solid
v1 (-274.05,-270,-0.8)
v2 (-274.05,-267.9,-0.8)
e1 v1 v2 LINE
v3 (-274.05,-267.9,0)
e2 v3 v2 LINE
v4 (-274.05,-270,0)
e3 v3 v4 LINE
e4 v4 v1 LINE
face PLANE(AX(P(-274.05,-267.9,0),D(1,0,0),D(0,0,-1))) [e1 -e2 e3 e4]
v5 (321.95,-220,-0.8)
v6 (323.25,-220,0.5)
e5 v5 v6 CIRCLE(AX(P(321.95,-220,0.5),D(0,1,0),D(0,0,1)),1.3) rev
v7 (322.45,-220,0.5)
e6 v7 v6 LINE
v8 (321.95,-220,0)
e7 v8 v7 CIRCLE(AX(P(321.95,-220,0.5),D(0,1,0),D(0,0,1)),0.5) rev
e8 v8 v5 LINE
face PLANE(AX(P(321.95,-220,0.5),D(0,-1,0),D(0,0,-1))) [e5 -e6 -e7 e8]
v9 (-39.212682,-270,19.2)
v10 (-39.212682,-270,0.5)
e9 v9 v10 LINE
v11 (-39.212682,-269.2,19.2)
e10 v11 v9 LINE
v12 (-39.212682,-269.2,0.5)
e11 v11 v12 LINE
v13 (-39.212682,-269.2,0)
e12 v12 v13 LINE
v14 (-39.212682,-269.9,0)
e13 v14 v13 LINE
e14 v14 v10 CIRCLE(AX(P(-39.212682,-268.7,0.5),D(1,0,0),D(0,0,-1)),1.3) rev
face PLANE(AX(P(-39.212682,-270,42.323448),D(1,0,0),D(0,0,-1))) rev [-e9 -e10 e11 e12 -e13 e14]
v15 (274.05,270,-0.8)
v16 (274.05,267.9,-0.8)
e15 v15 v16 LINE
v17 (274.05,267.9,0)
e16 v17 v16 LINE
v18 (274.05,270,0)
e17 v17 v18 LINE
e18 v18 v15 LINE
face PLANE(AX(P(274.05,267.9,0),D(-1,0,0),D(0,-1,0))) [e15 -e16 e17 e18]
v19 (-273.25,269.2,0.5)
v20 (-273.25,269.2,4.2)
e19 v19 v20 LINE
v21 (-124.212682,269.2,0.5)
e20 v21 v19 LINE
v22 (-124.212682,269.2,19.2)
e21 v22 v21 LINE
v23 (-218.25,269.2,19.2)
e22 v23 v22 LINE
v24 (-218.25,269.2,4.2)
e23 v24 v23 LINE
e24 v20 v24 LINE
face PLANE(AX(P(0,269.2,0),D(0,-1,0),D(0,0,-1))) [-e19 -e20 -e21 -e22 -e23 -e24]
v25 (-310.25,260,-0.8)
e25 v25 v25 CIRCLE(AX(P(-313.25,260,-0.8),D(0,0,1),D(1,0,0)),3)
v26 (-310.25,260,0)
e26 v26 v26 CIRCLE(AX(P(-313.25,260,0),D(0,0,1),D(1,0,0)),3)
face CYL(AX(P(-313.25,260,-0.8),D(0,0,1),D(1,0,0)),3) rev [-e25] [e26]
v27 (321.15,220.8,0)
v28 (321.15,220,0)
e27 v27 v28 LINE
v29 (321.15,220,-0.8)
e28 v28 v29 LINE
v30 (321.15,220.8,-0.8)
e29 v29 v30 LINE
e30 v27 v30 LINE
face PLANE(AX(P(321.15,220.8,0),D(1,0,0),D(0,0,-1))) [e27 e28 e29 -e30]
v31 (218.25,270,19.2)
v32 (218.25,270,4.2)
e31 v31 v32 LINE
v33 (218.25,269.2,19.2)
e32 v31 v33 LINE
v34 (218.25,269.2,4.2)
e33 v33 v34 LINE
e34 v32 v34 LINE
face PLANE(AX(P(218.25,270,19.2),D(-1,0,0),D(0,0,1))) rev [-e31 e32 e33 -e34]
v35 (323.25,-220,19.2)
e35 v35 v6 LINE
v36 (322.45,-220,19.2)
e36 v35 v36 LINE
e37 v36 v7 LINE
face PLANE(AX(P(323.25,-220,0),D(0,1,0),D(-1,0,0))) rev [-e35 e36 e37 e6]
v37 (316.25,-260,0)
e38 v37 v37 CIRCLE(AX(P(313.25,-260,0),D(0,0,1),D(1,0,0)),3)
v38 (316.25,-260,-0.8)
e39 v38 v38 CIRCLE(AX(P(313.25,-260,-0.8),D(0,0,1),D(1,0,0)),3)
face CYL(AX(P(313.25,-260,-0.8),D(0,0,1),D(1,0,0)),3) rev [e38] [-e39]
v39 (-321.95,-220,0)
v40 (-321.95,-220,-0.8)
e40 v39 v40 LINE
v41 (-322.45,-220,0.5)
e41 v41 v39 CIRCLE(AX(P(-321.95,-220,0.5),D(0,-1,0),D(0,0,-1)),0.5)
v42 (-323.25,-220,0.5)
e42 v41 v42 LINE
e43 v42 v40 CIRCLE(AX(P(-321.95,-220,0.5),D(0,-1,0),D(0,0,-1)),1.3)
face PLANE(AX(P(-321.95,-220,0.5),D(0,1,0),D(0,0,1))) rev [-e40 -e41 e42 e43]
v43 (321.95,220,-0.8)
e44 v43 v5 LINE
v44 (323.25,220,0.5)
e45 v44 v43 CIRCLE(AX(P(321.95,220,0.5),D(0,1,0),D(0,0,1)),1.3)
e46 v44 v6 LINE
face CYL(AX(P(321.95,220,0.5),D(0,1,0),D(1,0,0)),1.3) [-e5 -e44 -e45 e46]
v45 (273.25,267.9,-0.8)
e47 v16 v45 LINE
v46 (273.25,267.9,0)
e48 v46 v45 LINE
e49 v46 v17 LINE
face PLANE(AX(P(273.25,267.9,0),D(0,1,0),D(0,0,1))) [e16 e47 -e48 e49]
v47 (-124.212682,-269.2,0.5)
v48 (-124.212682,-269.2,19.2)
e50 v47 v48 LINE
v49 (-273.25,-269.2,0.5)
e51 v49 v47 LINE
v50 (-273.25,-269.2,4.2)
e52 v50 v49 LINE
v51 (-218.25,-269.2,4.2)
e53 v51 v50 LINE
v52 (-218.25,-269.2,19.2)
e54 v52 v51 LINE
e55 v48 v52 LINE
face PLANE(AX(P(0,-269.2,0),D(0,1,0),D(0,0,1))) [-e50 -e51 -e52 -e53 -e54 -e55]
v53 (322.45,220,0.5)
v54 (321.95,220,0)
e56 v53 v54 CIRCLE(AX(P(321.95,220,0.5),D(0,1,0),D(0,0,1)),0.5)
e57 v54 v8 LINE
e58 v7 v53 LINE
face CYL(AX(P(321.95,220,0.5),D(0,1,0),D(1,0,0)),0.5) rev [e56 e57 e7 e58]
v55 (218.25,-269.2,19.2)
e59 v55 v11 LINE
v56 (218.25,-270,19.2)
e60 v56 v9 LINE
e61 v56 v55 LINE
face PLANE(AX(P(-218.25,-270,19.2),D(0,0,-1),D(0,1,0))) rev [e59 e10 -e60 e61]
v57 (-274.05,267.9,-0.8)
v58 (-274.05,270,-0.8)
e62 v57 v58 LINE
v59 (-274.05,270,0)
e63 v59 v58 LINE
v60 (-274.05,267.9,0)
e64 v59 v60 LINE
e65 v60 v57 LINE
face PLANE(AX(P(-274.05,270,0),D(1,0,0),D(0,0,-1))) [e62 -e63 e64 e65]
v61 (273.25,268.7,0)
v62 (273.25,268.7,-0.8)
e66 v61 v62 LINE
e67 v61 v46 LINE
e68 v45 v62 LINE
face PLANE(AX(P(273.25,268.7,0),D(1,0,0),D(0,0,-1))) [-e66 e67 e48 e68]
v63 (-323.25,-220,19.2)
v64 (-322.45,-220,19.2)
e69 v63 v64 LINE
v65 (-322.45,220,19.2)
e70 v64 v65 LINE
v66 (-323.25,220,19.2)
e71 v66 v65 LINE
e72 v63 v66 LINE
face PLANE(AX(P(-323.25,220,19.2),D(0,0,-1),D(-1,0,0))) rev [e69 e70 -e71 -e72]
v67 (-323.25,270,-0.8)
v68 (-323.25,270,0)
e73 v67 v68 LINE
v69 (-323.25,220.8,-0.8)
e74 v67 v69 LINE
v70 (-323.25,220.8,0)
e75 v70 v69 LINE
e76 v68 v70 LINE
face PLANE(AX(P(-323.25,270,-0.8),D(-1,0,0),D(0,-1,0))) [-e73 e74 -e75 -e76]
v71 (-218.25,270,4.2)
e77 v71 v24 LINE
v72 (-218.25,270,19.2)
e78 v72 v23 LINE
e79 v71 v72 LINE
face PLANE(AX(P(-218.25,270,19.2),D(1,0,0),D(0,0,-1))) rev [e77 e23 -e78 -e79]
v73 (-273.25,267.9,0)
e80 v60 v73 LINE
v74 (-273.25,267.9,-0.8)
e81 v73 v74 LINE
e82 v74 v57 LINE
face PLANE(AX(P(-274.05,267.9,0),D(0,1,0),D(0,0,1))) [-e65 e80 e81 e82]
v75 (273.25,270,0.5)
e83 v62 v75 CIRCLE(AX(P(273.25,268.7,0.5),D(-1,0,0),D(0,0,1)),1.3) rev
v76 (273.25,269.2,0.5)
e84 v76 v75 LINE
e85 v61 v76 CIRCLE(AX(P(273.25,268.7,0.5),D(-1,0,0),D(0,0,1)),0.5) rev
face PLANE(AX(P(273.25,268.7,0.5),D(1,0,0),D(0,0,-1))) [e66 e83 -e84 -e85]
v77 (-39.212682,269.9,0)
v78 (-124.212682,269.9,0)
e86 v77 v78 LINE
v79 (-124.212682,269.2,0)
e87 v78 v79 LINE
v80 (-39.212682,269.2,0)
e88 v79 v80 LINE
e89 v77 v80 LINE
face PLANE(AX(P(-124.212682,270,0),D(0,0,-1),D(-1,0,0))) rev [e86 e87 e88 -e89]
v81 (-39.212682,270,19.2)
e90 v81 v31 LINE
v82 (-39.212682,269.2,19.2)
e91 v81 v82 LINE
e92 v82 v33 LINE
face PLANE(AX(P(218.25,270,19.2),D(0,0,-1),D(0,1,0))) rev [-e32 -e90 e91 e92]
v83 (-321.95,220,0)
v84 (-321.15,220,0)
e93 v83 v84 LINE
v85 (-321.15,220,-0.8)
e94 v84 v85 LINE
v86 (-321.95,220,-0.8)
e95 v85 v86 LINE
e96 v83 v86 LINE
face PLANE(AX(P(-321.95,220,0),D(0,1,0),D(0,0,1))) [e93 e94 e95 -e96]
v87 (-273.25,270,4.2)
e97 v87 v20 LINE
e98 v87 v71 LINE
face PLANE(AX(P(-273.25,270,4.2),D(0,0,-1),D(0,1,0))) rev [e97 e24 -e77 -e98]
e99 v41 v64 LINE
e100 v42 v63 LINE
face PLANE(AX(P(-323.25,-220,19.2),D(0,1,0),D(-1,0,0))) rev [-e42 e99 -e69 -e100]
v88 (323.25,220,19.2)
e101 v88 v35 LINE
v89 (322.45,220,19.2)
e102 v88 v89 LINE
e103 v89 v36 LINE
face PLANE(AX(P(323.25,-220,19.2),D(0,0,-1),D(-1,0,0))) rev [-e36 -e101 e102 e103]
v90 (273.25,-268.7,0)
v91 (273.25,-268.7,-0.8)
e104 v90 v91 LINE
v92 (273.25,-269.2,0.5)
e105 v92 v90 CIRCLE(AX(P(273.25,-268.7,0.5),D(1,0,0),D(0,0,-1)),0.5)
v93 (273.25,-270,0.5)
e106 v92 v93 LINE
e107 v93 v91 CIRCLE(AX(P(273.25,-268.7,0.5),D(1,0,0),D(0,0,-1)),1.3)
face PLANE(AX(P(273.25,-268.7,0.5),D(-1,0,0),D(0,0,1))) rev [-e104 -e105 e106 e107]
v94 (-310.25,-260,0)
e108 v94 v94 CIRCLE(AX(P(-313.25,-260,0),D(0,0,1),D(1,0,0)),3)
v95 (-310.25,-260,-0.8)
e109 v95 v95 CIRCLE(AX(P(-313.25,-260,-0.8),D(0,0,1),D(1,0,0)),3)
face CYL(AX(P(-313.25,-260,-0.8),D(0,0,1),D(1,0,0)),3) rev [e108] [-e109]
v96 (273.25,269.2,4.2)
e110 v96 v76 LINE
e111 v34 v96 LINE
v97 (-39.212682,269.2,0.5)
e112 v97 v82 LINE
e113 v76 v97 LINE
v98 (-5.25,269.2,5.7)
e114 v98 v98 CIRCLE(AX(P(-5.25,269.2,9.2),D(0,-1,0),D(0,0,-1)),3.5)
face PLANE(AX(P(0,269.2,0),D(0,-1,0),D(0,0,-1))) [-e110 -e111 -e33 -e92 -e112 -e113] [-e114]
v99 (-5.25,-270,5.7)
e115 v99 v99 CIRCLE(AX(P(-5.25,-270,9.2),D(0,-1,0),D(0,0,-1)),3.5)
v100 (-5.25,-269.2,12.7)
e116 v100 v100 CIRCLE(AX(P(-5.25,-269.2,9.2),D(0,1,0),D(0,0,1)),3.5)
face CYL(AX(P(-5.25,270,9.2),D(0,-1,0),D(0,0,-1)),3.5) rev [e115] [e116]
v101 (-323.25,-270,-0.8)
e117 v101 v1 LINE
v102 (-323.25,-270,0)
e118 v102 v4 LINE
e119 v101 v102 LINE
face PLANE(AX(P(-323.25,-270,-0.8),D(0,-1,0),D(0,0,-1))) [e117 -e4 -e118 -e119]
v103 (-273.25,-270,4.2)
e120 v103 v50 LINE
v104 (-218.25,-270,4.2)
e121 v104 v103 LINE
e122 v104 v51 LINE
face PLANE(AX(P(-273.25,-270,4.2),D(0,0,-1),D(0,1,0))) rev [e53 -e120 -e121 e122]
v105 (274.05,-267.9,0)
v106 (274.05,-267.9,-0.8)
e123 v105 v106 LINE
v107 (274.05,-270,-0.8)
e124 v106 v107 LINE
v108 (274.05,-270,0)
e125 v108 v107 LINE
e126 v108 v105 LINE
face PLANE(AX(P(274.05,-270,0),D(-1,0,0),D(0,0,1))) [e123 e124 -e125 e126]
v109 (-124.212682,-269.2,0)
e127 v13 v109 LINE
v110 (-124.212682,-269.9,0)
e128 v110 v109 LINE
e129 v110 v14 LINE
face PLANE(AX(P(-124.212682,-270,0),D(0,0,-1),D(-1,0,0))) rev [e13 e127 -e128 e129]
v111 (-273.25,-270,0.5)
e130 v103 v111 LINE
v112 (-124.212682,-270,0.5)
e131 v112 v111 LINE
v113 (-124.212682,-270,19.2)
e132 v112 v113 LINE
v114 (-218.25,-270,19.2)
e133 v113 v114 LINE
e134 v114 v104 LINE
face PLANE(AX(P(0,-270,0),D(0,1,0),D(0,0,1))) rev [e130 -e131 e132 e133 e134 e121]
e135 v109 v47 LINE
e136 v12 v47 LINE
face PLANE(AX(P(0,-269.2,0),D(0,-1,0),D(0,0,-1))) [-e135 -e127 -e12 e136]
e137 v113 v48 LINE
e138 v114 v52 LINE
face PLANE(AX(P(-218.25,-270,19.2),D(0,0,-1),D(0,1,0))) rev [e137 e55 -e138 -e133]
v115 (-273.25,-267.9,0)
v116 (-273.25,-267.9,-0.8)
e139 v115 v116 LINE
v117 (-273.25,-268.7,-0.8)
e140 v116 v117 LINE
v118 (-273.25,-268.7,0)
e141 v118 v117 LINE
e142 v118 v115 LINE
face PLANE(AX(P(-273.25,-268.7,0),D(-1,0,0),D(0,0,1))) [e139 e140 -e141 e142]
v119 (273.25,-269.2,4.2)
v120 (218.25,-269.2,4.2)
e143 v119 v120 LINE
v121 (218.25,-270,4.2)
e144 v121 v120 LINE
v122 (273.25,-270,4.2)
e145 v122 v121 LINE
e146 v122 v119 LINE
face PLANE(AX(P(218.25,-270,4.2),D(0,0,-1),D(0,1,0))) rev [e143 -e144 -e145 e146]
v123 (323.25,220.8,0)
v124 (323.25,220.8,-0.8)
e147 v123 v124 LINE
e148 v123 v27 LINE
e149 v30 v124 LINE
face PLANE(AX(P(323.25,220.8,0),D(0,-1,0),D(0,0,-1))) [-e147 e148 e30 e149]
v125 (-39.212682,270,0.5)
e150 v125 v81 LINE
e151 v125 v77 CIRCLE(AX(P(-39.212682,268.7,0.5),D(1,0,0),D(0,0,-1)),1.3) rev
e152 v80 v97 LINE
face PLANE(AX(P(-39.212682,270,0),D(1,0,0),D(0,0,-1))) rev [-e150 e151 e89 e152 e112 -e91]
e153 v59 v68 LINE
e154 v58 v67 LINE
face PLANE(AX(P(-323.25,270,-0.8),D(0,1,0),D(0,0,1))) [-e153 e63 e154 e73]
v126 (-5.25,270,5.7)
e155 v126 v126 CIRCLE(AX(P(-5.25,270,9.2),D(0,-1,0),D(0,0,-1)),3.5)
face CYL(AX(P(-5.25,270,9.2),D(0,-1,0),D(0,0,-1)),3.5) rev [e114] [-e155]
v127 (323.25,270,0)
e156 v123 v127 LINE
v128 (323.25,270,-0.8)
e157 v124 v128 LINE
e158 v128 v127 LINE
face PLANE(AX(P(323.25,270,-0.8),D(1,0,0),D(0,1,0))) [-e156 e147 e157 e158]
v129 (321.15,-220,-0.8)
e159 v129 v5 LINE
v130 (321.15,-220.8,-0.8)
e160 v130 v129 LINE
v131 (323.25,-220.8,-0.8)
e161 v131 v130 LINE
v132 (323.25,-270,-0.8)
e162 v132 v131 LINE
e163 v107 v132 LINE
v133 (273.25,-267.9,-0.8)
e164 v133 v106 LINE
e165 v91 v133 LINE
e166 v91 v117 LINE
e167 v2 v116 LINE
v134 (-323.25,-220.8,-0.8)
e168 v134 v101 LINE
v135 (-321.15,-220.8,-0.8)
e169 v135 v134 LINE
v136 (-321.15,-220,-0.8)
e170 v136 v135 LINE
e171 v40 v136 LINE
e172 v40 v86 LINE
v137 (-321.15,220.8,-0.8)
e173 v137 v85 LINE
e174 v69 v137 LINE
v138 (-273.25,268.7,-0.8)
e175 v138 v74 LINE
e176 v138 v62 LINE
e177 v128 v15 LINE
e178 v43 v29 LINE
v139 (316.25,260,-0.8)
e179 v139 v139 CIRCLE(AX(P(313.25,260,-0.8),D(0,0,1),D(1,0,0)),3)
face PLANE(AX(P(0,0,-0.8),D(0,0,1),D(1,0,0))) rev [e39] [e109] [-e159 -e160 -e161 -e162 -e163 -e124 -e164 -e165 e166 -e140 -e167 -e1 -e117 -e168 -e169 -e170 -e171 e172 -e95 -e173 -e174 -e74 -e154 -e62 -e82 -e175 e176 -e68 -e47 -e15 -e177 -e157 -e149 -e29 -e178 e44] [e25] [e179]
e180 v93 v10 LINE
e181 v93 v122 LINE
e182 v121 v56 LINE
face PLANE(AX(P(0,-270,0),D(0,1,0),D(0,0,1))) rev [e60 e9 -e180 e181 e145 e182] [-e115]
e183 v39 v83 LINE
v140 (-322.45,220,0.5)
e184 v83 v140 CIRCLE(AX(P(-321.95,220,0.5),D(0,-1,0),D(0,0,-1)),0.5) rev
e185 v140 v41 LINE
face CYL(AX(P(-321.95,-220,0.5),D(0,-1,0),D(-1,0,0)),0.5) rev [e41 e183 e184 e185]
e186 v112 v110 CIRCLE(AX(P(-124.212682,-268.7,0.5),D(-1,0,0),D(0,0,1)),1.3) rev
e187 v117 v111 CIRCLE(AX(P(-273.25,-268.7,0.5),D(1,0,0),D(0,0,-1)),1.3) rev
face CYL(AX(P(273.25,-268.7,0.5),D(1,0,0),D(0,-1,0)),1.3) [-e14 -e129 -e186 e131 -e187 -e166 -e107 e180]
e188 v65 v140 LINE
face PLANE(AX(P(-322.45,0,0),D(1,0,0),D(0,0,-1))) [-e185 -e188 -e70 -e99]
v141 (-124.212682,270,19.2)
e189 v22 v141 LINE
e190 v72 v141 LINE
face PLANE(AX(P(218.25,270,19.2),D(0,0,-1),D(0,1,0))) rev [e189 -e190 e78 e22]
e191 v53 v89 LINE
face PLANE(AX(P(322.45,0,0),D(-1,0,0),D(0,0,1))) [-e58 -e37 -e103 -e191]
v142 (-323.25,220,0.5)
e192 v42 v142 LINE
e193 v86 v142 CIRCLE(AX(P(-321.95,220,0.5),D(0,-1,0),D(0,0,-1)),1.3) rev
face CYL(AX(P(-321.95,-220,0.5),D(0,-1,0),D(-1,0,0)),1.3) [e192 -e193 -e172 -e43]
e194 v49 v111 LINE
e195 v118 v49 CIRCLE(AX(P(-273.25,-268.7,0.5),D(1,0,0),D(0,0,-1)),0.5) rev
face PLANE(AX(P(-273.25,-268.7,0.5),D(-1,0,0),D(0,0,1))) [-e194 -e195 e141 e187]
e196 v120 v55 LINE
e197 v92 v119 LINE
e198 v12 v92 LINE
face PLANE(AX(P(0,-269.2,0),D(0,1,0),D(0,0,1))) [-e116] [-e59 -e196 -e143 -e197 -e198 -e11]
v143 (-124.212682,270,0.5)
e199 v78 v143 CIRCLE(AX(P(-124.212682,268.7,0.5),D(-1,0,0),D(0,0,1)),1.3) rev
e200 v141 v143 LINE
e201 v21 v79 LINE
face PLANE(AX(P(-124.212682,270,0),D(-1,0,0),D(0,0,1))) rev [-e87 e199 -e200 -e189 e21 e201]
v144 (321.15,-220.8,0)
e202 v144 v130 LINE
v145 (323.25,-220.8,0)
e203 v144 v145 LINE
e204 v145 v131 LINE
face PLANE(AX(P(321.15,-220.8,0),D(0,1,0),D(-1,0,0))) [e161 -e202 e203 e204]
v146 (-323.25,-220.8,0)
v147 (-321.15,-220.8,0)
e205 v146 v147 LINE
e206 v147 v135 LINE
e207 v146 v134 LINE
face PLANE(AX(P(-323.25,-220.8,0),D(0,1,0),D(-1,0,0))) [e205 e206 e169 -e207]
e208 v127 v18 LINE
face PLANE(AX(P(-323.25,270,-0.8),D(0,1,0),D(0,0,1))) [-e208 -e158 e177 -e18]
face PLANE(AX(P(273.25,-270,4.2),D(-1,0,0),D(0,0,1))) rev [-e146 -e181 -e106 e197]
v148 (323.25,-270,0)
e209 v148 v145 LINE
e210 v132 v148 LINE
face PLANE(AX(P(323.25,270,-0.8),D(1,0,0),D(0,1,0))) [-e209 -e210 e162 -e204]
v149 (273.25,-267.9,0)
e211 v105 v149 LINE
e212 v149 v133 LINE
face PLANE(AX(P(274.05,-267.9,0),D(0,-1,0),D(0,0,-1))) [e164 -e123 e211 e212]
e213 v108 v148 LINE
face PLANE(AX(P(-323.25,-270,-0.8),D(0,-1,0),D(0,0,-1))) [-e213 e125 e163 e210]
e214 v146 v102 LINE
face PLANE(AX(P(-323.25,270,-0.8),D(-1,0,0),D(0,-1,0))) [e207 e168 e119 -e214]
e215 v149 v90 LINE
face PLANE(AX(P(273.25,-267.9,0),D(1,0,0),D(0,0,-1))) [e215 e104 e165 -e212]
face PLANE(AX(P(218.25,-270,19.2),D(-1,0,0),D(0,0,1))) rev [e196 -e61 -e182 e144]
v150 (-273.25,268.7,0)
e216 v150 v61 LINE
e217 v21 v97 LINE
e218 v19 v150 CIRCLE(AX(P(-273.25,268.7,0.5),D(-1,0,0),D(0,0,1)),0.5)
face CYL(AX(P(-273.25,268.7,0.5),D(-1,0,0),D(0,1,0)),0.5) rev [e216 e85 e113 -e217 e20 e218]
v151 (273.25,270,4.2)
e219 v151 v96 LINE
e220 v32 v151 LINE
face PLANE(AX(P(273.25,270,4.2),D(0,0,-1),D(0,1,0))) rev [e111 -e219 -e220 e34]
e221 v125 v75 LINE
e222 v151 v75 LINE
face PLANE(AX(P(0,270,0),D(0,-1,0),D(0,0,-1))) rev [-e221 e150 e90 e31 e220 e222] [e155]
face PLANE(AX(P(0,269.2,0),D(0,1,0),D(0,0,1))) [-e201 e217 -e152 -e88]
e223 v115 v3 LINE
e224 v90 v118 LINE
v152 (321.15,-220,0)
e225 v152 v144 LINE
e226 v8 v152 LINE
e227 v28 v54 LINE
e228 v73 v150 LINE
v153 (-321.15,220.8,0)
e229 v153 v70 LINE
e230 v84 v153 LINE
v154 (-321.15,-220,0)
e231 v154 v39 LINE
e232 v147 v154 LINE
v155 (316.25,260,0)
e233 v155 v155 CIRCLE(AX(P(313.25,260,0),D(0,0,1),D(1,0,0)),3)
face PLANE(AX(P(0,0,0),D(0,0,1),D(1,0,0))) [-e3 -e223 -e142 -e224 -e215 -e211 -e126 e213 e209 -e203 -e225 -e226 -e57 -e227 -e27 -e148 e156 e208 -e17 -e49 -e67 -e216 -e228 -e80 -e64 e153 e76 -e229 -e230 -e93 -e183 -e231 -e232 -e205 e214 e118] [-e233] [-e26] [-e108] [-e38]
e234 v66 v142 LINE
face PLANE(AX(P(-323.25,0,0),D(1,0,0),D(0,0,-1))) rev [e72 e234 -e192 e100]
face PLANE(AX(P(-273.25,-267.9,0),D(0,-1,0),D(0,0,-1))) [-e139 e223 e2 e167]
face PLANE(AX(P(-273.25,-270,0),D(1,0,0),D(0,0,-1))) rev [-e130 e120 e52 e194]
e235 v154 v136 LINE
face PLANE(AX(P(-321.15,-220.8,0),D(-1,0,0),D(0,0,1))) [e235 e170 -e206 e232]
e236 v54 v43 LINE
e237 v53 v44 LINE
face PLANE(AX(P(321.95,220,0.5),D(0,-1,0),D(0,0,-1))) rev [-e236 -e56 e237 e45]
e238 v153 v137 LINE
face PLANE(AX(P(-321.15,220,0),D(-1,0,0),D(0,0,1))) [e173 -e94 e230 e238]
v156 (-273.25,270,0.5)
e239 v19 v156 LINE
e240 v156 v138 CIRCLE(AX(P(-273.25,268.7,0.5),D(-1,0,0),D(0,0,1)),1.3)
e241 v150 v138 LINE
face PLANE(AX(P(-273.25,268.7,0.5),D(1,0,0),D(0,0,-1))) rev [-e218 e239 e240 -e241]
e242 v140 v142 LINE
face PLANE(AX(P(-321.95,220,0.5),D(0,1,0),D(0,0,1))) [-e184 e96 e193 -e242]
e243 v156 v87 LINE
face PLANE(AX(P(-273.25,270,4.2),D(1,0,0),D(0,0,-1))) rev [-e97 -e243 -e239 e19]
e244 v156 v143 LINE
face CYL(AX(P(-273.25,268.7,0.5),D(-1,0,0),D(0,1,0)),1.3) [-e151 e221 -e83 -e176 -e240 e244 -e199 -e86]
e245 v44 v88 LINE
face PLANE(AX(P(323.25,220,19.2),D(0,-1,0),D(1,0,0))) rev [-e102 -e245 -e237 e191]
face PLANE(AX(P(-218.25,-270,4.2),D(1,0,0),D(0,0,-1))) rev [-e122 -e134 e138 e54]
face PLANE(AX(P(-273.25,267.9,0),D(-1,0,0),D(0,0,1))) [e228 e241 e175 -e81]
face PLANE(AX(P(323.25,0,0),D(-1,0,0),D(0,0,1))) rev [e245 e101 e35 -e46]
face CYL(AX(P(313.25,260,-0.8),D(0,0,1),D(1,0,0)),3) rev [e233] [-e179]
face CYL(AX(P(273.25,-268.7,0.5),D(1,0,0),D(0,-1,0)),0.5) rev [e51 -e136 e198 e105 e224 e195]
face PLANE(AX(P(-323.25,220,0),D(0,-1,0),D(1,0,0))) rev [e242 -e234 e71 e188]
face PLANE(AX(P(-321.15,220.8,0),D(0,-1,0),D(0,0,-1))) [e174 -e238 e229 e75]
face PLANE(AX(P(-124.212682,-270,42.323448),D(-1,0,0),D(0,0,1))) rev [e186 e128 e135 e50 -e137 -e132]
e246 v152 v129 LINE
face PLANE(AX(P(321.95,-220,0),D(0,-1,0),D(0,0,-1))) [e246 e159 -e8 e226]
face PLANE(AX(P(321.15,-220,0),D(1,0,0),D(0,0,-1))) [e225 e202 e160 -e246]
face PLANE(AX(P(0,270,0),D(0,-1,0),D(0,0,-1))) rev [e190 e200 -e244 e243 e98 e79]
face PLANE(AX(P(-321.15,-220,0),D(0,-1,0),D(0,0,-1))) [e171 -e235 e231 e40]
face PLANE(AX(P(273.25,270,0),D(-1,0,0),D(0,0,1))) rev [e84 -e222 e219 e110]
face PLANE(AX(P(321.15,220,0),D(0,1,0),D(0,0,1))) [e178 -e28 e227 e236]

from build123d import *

# Parameters (mm, degrees)
SKETCH_1_W                        = 646.5
SKETCH_1_H                        = 540
SKETCH_1_R                        = 3
SM_BASE_FLANGE_1_DEPTH            = 0.8
SM_EDGE_FLANGE_1_STRIP_W          = 4.2
SM_EDGE_FLANGE_1_STRIP_H          = 0.8
SM_EDGE_FLANGE_1_STRIP_CUT_DEPTH  = 440
SM_EDGE_FLANGE_1_RELIEF_W         = 5
SM_EDGE_FLANGE_1_RELIEF_H         = 0.8
SM_EDGE_FLANGE_1_RELIEF_CUT_DEPTH = 0.8
SM_EDGE_FLANGE_1_DEPTH            = 440
SM_EDGE_FLANGE_2_STRIP_W          = 4.2
SM_EDGE_FLANGE_2_STRIP_H          = 0.8
SM_EDGE_FLANGE_2_STRIP_CUT_DEPTH  = 440
SM_EDGE_FLANGE_2_RELIEF_W         = 5
SM_EDGE_FLANGE_2_RELIEF_H         = 0.8
SM_EDGE_FLANGE_2_RELIEF_CUT_DEPTH = 0.8
SM_EDGE_FLANGE_2_DEPTH            = 440
SM_EDGE_FLANGE_3_STRIP_W          = 4.2
SM_EDGE_FLANGE_3_STRIP_H          = 0.8
SM_EDGE_FLANGE_3_STRIP_CUT_DEPTH  = 546.5
SM_EDGE_FLANGE_3_RELIEF_W         = 5
SM_EDGE_FLANGE_3_RELIEF_H         = 0.8
SM_EDGE_FLANGE_3_RELIEF_CUT_DEPTH = 0.8
SM_EDGE_FLANGE_3_DEPTH            = 546.5
SM_EDGE_FLANGE_3_FLAT_DEPTH       = 0.8
SM_EDGE_FLANGE_4_STRIP_W          = 4.2
SM_EDGE_FLANGE_4_STRIP_H          = 0.8
SM_EDGE_FLANGE_4_STRIP_CUT_DEPTH  = 546.5
SM_EDGE_FLANGE_4_RELIEF_W         = 5
SM_EDGE_FLANGE_4_RELIEF_H         = 0.8
SM_EDGE_FLANGE_4_RELIEF_CUT_DEPTH = 0.8
SM_EDGE_FLANGE_4_DEPTH            = 546.5
SM_EDGE_FLANGE_4_FLAT_DEPTH       = 0.8
SKETCH_18_W                       = 85
SKETCH_18_H                       = 42.323448133
CUT_EXTRUDE_1_DEPTH               = 629.964102712
SKETCH_19_W                       = 85
SKETCH_19_H                       = 50.946353984
CUT_EXTRUDE_2_DEPTH               = 629.964102712
SKETCH_20_R                       = 3.5
CUT_EXTRUDE_3_DEPTH               = 630.650063527


# Sheet-metal steps are written as plain solids
with BuildPart() as part:
    # Sketch 1 → 基体-法兰1 (new body)
    with BuildSketch(Plane.XY):
        Rectangle(SKETCH_1_W, SKETCH_1_H)
        with Locations((313.25, 260)):
            Circle(SKETCH_1_R, mode=Mode.SUBTRACT)
        with Locations((-313.25, 260)):
            Circle(SKETCH_1_R, mode=Mode.SUBTRACT)
        with Locations((-313.25, -260)):
            Circle(SKETCH_1_R, mode=Mode.SUBTRACT)
        with Locations((313.25, -260)):
            Circle(SKETCH_1_R, mode=Mode.SUBTRACT)
    extrude(amount=-SM_BASE_FLANGE_1_DEPTH)

    # 边线-法兰1 strip (across the edge) → 边线-法兰1 strip cut (cut)
    with BuildSketch(Plane(origin=(323.25, -220, 0), x_dir=(-1, 0, 0), z_dir=(0, 1, 0))):
        with Locations((-0.8, -0.4)):
            Rectangle(SM_EDGE_FLANGE_1_STRIP_W, SM_EDGE_FLANGE_1_STRIP_H)
    extrude(amount=SM_EDGE_FLANGE_1_STRIP_CUT_DEPTH, mode=Mode.SUBTRACT)

    # 边线-法兰1 relief (on the sheet) → 边线-法兰1 relief cut (cut)
    with BuildSketch(Plane(origin=(321.95, -220, 0), x_dir=(-1, 0, 0), z_dir=(0, 0, 1))):
        with Locations((-1.7, 0.4)):
            Rectangle(SM_EDGE_FLANGE_1_RELIEF_W, SM_EDGE_FLANGE_1_RELIEF_H)
        with Locations((-1.7, -440.4)):
            Rectangle(SM_EDGE_FLANGE_1_RELIEF_W, SM_EDGE_FLANGE_1_RELIEF_H)
    extrude(amount=-SM_EDGE_FLANGE_1_RELIEF_CUT_DEPTH, mode=Mode.SUBTRACT)

    # 边线-法兰1 section (across the edge) → 边线-法兰1 (add)
    with BuildSketch(Plane(origin=(323.25, -220, 0), x_dir=(-1, 0, 0), z_dir=(0, 1, 0))):
        with BuildLine():
            Line((0, 0.5), (0, 19.2))
            Line((0, 19.2), (0.8, 19.2))
            Line((0.8, 19.2), (0.8, 0.5))
            ThreePointArc((0.8, 0.5), (0.946446609, 0.146446609), (1.3, 0))
            Line((1.3, 0), (1.3, -0.8))
            ThreePointArc((1.3, -0.8), (0.380761184, -0.419238816), (0, 0.5))
        make_face()
    extrude(amount=SM_EDGE_FLANGE_1_DEPTH)

    # 边线-法兰2 strip (across the edge) → 边线-法兰2 strip cut (cut)
    with BuildSketch(Plane(origin=(-323.25, 220, 0), x_dir=(1, 0, 0), z_dir=(0, -1, 0))):
        with Locations((-0.8, -0.4)):
            Rectangle(SM_EDGE_FLANGE_2_STRIP_W, SM_EDGE_FLANGE_2_STRIP_H)
    extrude(amount=SM_EDGE_FLANGE_2_STRIP_CUT_DEPTH, mode=Mode.SUBTRACT)

    # 边线-法兰2 relief (on the sheet) → 边线-法兰2 relief cut (cut)
    with BuildSketch(Plane(origin=(-321.95, 220, 0), x_dir=(1, 0, 0), z_dir=(0, 0, 1))):
        with Locations((-1.7, 0.4)):
            Rectangle(SM_EDGE_FLANGE_2_RELIEF_W, SM_EDGE_FLANGE_2_RELIEF_H)
        with Locations((-1.7, -440.4)):
            Rectangle(SM_EDGE_FLANGE_2_RELIEF_W, SM_EDGE_FLANGE_2_RELIEF_H)
    extrude(amount=-SM_EDGE_FLANGE_2_RELIEF_CUT_DEPTH, mode=Mode.SUBTRACT)

    # 边线-法兰2 section (across the edge) → 边线-法兰2 (add)
    with BuildSketch(Plane(origin=(-323.25, 220, 0), x_dir=(1, 0, 0), z_dir=(0, -1, 0))):
        with BuildLine():
            Line((0, 0.5), (0, 19.2))
            Line((0, 19.2), (0.8, 19.2))
            Line((0.8, 19.2), (0.8, 0.5))
            ThreePointArc((0.8, 0.5), (0.946446609, 0.146446609), (1.3, 0))
            Line((1.3, 0), (1.3, -0.8))
            ThreePointArc((1.3, -0.8), (0.380761184, -0.419238816), (0, 0.5))
        make_face()
    extrude(amount=SM_EDGE_FLANGE_2_DEPTH)

    # 边线-法兰3 strip (across the edge) → 边线-法兰3 strip cut (cut)
    with BuildSketch(Plane(origin=(-273.25, -270, 0), x_dir=(0, 1, 0), z_dir=(1, 0, 0))):
        with Locations((-0.8, -0.4)):
            Rectangle(SM_EDGE_FLANGE_3_STRIP_W, SM_EDGE_FLANGE_3_STRIP_H)
    extrude(amount=SM_EDGE_FLANGE_3_STRIP_CUT_DEPTH, mode=Mode.SUBTRACT)

    # 边线-法兰3 relief (on the sheet) → 边线-法兰3 relief cut (cut)
    with BuildSketch(Plane(origin=(-273.25, -268.7, 0), x_dir=(0, 1, 0), z_dir=(0, 0, 1))):
        with Locations((-1.7, 0.4)):
            Rectangle(SM_EDGE_FLANGE_3_RELIEF_W, SM_EDGE_FLANGE_3_RELIEF_H)
        with Locations((-1.7, -546.9)):
            Rectangle(SM_EDGE_FLANGE_3_RELIEF_W, SM_EDGE_FLANGE_3_RELIEF_H)
    extrude(amount=-SM_EDGE_FLANGE_3_RELIEF_CUT_DEPTH, mode=Mode.SUBTRACT)

    # 边线-法兰3 bend section (across the edge) → 边线-法兰3 (add)
    with BuildSketch(Plane(origin=(-273.25, -270, 0), x_dir=(0, 1, 0), z_dir=(1, 0, 0))):
        with BuildLine():
            Line((0, 0.5), (0.8, 0.5))
            ThreePointArc((0.8, 0.5), (0.946446609, 0.146446609), (1.3, 0))
            Line((1.3, 0), (1.3, -0.8))
            ThreePointArc((1.3, -0.8), (0.380761184, -0.419238816), (0, 0.5))
        make_face()
    extrude(amount=SM_EDGE_FLANGE_3_DEPTH)

    # 边线-法兰3 profile (on flange) → 边线-法兰3 flat (add)
    with BuildSketch(Plane.XZ.offset(270)):
        Polygon((-273.25, 0.5), (273.25, 0.5), (273.25, 4.2), (218.25, 4.2), (218.25, 19.2), (-218.25, 19.2), (-218.25, 4.2), (-273.25, 4.2), align=None)
    extrude(amount=-SM_EDGE_FLANGE_3_FLAT_DEPTH)

    # 边线-法兰4 strip (across the edge) → 边线-法兰4 strip cut (cut)
    with BuildSketch(Plane(origin=(273.25, 270, 0), x_dir=(0, -1, 0), z_dir=(-1, 0, 0))):
        with Locations((-0.8, -0.4)):
            Rectangle(SM_EDGE_FLANGE_4_STRIP_W, SM_EDGE_FLANGE_4_STRIP_H)
    extrude(amount=SM_EDGE_FLANGE_4_STRIP_CUT_DEPTH, mode=Mode.SUBTRACT)

    # 边线-法兰4 relief (on the sheet) → 边线-法兰4 relief cut (cut)
    with BuildSketch(Plane(origin=(273.25, 268.7, 0), x_dir=(0, -1, 0), z_dir=(0, 0, 1))):
        with Locations((-1.7, 0.4)):
            Rectangle(SM_EDGE_FLANGE_4_RELIEF_W, SM_EDGE_FLANGE_4_RELIEF_H)
        with Locations((-1.7, -546.9)):
            Rectangle(SM_EDGE_FLANGE_4_RELIEF_W, SM_EDGE_FLANGE_4_RELIEF_H)
    extrude(amount=-SM_EDGE_FLANGE_4_RELIEF_CUT_DEPTH, mode=Mode.SUBTRACT)

    # 边线-法兰4 bend section (across the edge) → 边线-法兰4 (add)
    with BuildSketch(Plane(origin=(273.25, 270, 0), x_dir=(0, -1, 0), z_dir=(-1, 0, 0))):
        with BuildLine():
            Line((0, 0.5), (0.8, 0.5))
            ThreePointArc((0.8, 0.5), (0.946446609, 0.146446609), (1.3, 0))
            Line((1.3, 0), (1.3, -0.8))
            ThreePointArc((1.3, -0.8), (0.380761184, -0.419238816), (0, 0.5))
        make_face()
    extrude(amount=SM_EDGE_FLANGE_4_DEPTH)

    # 边线-法兰4 profile (on flange) → 边线-法兰4 flat (add)
    with BuildSketch(Plane(origin=(0, 270, 0), x_dir=(-1, 0, 0), z_dir=(0, 1, 0))):
        Polygon((-273.25, 0.5), (273.25, 0.5), (273.25, 4.2), (218.25, 4.2), (218.25, 19.2), (-218.25, 19.2), (-218.25, 4.2), (-273.25, 4.2), align=None)
    extrude(amount=-SM_EDGE_FLANGE_4_FLAT_DEPTH)

    # 草图18 → 切除-拉伸1 (cut, through all)
    with BuildSketch(Plane(origin=(0, -269.2, 0), x_dir=(1, 0, 0), z_dir=(0, 1, 0))):
        with Locations((-81.712681962, -21.161724066)):
            Rectangle(SKETCH_18_W, SKETCH_18_H)
    extrude(amount=-CUT_EXTRUDE_1_DEPTH, mode=Mode.SUBTRACT)

    # 草图19 → 切除-拉伸2 (cut, through all)
    with BuildSketch(Plane.XZ.offset(-269.2)):
        with Locations((-81.712681962, 25.473176992)):
            Rectangle(SKETCH_19_W, SKETCH_19_H)
    extrude(amount=-CUT_EXTRUDE_2_DEPTH, mode=Mode.SUBTRACT)

    # 草图20 → 切除-拉伸3 (cut, through all)
    with BuildSketch(Plane(origin=(0, -270, 0), x_dir=(-1, 0, 0), z_dir=(0, -1, 0))):
        with Locations(Location((5.25, -9.2, 0), (0, 0, 90))):
            Circle(SKETCH_20_R)
    extrude(amount=-CUT_EXTRUDE_3_DEPTH, mode=Mode.SUBTRACT)


solid = part.part
